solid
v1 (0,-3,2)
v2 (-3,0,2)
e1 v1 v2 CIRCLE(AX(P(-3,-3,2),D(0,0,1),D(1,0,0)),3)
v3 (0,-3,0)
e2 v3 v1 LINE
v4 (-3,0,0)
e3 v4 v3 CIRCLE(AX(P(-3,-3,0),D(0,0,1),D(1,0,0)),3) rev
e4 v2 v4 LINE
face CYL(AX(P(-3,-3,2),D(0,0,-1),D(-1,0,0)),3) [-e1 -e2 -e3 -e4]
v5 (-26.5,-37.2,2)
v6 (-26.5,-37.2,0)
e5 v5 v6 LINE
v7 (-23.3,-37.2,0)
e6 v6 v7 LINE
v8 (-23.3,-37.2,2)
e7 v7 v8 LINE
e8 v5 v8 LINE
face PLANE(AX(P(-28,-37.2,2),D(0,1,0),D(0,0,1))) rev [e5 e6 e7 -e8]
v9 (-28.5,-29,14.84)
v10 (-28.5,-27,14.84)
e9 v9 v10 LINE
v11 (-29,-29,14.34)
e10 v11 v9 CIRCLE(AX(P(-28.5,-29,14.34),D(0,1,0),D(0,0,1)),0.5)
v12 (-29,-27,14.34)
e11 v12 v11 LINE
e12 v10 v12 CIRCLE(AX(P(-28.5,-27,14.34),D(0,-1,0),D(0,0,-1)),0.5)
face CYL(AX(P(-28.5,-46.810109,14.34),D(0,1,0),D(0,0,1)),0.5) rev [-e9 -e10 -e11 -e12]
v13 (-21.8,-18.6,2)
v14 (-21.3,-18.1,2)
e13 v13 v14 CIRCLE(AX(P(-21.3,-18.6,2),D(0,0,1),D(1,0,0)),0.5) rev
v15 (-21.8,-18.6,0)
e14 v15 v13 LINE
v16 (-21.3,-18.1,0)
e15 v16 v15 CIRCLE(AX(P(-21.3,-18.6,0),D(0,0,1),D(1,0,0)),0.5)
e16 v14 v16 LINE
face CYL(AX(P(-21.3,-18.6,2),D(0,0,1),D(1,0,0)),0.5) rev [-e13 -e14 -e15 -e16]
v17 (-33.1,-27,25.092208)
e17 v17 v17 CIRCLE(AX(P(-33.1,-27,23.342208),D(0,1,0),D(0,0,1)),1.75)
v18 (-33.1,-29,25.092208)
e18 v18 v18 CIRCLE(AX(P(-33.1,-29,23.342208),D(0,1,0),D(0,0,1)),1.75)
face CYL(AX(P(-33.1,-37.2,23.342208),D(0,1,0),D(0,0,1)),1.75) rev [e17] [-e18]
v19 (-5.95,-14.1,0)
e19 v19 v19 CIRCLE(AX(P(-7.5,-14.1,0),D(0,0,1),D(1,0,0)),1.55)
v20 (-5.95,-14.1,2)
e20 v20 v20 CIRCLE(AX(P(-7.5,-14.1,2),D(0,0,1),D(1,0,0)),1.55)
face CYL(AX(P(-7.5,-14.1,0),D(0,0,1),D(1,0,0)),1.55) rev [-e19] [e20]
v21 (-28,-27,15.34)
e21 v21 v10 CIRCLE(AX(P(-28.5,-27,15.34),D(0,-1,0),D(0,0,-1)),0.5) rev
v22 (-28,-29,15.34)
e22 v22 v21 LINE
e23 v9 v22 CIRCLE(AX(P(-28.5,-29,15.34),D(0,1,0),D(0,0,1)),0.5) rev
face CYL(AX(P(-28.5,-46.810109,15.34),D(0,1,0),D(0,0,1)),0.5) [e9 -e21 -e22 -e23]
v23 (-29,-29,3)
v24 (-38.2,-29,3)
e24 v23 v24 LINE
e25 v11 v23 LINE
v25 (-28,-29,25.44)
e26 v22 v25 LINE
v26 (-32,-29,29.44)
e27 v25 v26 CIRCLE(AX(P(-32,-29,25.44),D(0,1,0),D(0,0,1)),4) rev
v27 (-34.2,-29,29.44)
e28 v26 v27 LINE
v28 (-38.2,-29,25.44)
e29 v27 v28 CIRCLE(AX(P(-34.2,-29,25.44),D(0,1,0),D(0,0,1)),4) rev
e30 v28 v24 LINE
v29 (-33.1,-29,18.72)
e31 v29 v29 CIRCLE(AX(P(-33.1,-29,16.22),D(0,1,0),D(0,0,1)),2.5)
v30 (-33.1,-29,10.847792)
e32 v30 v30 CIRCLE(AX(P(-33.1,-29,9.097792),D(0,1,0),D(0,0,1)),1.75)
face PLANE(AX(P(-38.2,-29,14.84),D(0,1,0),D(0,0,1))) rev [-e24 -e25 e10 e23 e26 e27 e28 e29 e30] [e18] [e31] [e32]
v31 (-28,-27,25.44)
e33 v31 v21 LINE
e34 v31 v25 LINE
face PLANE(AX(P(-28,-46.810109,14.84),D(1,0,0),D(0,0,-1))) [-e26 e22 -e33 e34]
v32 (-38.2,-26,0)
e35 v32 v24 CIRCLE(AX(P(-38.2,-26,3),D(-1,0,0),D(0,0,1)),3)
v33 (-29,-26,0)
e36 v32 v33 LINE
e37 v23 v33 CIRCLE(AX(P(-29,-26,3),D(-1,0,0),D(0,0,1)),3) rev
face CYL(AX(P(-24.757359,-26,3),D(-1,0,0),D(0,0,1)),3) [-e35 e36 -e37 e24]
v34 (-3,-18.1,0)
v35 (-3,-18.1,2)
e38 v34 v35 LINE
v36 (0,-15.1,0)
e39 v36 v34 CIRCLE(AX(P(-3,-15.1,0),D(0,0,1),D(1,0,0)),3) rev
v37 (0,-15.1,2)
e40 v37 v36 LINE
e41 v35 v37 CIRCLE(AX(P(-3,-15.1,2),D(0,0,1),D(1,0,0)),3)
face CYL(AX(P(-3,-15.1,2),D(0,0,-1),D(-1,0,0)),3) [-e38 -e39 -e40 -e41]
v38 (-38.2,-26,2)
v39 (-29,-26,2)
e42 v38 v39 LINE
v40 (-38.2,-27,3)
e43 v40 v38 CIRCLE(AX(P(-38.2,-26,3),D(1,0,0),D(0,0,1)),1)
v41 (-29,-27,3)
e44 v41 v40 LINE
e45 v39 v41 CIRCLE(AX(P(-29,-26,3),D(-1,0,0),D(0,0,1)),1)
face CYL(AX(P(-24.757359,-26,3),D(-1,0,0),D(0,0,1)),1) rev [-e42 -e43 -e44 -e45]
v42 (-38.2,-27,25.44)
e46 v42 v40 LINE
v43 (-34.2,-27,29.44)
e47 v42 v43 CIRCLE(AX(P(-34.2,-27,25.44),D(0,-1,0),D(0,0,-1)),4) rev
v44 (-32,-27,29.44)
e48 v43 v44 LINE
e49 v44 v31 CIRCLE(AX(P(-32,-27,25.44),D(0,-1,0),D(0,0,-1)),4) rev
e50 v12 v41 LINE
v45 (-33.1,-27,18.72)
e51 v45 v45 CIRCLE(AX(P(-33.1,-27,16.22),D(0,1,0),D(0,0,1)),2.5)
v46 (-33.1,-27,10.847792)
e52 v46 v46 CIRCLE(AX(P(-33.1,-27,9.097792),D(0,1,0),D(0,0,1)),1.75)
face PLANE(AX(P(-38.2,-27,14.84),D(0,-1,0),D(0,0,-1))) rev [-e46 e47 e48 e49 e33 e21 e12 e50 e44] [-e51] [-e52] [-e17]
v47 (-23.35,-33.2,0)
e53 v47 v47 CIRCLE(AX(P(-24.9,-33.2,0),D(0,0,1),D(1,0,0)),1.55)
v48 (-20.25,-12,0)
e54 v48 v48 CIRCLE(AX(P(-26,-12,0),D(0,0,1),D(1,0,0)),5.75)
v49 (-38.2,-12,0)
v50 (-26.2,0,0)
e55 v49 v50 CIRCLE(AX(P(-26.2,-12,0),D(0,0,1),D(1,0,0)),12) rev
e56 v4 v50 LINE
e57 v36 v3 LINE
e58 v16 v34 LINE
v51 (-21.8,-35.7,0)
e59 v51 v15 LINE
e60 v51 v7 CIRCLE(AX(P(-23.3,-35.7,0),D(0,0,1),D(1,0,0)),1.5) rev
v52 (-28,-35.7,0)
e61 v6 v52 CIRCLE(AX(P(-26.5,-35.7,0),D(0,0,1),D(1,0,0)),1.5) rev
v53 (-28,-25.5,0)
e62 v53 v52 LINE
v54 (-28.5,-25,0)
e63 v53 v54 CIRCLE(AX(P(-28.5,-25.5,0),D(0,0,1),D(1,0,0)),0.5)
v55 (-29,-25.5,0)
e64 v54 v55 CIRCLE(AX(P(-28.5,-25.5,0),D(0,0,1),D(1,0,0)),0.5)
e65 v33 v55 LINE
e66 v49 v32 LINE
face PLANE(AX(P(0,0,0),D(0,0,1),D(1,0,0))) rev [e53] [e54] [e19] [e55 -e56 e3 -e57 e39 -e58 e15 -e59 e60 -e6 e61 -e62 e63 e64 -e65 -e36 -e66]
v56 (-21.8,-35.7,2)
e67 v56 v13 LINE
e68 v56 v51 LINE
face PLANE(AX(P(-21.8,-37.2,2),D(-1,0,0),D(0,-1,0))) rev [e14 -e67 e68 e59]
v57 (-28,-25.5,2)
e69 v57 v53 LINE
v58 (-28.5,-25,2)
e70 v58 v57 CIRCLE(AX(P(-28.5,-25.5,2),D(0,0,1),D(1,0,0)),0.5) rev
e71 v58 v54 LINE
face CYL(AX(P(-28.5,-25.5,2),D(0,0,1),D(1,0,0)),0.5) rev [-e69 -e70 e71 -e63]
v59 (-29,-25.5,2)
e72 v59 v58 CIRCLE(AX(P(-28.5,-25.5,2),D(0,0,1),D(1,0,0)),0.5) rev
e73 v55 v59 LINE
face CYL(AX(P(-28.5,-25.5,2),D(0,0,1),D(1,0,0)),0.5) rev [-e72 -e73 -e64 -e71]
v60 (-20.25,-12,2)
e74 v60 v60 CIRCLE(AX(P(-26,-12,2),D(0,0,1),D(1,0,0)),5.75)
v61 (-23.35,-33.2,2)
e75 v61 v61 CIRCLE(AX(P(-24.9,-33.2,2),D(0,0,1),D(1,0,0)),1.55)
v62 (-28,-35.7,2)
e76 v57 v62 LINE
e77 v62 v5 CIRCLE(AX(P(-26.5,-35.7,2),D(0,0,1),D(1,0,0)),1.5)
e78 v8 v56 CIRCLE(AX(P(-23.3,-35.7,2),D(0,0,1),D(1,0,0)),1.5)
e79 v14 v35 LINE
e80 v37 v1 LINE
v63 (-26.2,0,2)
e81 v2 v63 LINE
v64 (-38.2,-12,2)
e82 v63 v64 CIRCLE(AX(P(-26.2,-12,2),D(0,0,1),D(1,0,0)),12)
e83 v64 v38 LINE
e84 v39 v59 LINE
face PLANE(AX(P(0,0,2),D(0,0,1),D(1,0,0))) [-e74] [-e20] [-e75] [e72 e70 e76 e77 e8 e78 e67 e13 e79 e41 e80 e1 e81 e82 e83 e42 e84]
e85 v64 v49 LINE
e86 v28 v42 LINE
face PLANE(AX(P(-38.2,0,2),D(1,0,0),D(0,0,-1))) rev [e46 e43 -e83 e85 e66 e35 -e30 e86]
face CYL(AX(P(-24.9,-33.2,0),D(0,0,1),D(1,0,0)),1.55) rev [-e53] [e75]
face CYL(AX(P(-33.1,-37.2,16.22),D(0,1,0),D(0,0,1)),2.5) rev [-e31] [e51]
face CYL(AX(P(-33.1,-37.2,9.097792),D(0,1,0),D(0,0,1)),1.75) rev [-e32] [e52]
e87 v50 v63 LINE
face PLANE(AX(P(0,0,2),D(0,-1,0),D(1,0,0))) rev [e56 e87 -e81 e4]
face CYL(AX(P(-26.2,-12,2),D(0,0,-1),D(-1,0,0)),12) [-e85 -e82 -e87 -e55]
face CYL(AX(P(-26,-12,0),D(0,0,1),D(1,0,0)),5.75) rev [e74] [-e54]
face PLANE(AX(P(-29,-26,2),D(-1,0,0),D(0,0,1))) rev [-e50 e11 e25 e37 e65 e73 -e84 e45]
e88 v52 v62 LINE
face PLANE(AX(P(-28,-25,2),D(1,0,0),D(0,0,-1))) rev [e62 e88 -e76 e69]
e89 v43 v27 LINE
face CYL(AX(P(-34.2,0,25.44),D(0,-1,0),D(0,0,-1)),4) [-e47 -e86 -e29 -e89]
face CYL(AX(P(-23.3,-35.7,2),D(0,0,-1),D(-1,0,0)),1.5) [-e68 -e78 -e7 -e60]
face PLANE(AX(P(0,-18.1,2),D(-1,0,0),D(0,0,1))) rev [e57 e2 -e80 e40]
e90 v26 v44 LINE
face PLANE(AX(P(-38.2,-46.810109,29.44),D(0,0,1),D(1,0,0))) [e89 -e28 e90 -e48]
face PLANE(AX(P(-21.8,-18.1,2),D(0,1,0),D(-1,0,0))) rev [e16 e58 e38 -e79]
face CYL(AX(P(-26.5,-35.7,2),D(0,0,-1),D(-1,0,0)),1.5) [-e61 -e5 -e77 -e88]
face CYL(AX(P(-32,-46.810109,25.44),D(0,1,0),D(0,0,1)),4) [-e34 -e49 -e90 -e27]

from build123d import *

# Parameters (mm, degrees)
BOSS_EXTRUDE1_DEPTH = 2
BOSS_EXTRUDE2_DEPTH = 9.2
SKETCH3_W           = 9.2
SKETCH3_H           = 2
BOSS_EXTRUDE3_DEPTH = 11.84
SKETCH4_W           = 10.2
SKETCH4_H           = 14.6
BOSS_EXTRUDE4_DEPTH = 2
FILLET1_R           = 3
FILLET2_R           = 12
SKETCH5_R           = 1.55
CUT_EXTRUDE1_DEPTH  = 60.966937557
FILLET3_R           = 1.5
FILLET4_R           = 0.5
FILLET5_R           = 0.5
FILLET6_R           = 4
FILLET7_R           = 0.5
SKETCH6_R           = 5.75
CUT_EXTRUDE2_DEPTH  = 60.966937557
SKETCH7_R           = 1.75
SKETCH7_R_2         = 2.5
CUT_EXTRUDE3_DEPTH  = 56.271634678


with BuildPart() as part:
    # Sketch1 → Boss-Extrude1 (new body)
    with BuildSketch(Plane.XY):
        Polygon((0, 0), (-38.2, 0), (-38.2, -26), (-29, -26), (-29, -25), (-28, -25), (-28, -37.2), (-21.8, -37.2), (-21.8, -18.1), (0, -18.1), align=None)
    extrude(amount=BOSS_EXTRUDE1_DEPTH)

    # Sketch2 → Boss-Extrude2 (add)
    with BuildSketch(Plane.ZY.offset(38.2)):
        with BuildLine():
            Line((0, -26), (2, -26))
            ThreePointArc((2, -26), (2.292893219, -26.707106781), (3, -27))
            Line((3, -27), (3, -29))
            ThreePointArc((3, -29), (0.878679656, -28.121320344), (0, -26))
        make_face()
    extrude(amount=-BOSS_EXTRUDE2_DEPTH)

    # Sketch3 → Boss-Extrude3 (add)
    with BuildSketch(Plane.XY.offset(3)):
        with Locations((-33.6, -28)):
            Rectangle(SKETCH3_W, SKETCH3_H)
    extrude(amount=BOSS_EXTRUDE3_DEPTH)

    # Sketch4 → Boss-Extrude4 (add)
    with BuildSketch(Plane(origin=(0, -27, 0), x_dir=(1, 0, 0), z_dir=(0, 1, 0))):
        with Locations((-33.1, -22.14)):
            Rectangle(SKETCH4_W, SKETCH4_H)
    extrude(amount=-BOSS_EXTRUDE4_DEPTH)

    # Fillet1
    fillet1_edges = [part.edges().sort_by_distance(p)[0] for p in [
        (0, -18.1, 1),
        (0, 0, 1),
    ]]
    fillet(fillet1_edges, radius=FILLET1_R)

    # Fillet2
    fillet2_edges = [part.edges().sort_by_distance(p)[0] for p in [
        (-38.2, 0, 1),
    ]]
    fillet(fillet2_edges, radius=FILLET2_R)

    # Sketch5 → Cut-Extrude1 (cut, through all)
    with BuildSketch(Plane.XY.offset(2)):
        with Locations((-7.5, -14.1)):
            Circle(SKETCH5_R)
        with Locations((-24.9, -33.2)):
            Circle(SKETCH5_R)
    extrude(amount=-CUT_EXTRUDE1_DEPTH, mode=Mode.SUBTRACT)

    # Fillet3
    fillet3_edges = [part.edges().sort_by_distance(p)[0] for p in [
        (-21.8, -37.2, 1),
        (-28, -37.2, 1),
    ]]
    fillet(fillet3_edges, radius=FILLET3_R)

    # Fillet4
    fillet4_edges = [part.edges().sort_by_distance(p)[0] for p in [
        (-28, -25, 1),
        (-29, -25, 1),
    ]]
    fillet(fillet4_edges, radius=FILLET4_R - 0.0001)  # a hair under: the kernel refuses the full size

    # Fillet5
    fillet5_edges = [part.edges().sort_by_distance(p)[0] for p in [
        (-29, -28, 14.84),
    ]]
    fillet(fillet5_edges, radius=FILLET5_R)
    fillet5_2_edges = [part.edges().sort_by_distance(p)[0] for p in [
        (-28, -28, 14.84),
    ]]
    fillet(fillet5_2_edges, radius=FILLET5_R - 0.0001)  # a hair under: the kernel refuses the full size

    # Fillet6
    fillet6_edges = [part.edges().sort_by_distance(p)[0] for p in [
        (-38.2, -28, 29.44),
        (-28, -28, 29.44),
    ]]
    fillet(fillet6_edges, radius=FILLET6_R)

    # Fillet7
    fillet7_edges = [part.edges().sort_by_distance(p)[0] for p in [
        (-21.8, -18.1, 1),
    ]]
    fillet(fillet7_edges, radius=FILLET7_R)

    # Sketch6 → Cut-Extrude2 (cut, through all)
    with BuildSketch(Plane.XY.offset(2)):
        with Locations((-26, -12)):
            Circle(SKETCH6_R)
    extrude(amount=-CUT_EXTRUDE2_DEPTH, mode=Mode.SUBTRACT)

    # Sketch7 → Cut-Extrude3 (cut, through all)
    with BuildSketch(Plane(origin=(0, -27, 0), x_dir=(1, 0, 0), z_dir=(0, 1, 0))):
        with Locations(Location((-33.1, -23.342208336, 0), (0, 0, 270))):
            Circle(SKETCH7_R)
        with Locations(Location((-33.1, -9.097791664, 0), (0, 0, 270))):
            Circle(SKETCH7_R)
        with Locations(Location((-33.1, -16.22, 0), (0, 0, 270))):
            Circle(SKETCH7_R_2)
    extrude(amount=-CUT_EXTRUDE3_DEPTH, mode=Mode.SUBTRACT)


solid = part.part
